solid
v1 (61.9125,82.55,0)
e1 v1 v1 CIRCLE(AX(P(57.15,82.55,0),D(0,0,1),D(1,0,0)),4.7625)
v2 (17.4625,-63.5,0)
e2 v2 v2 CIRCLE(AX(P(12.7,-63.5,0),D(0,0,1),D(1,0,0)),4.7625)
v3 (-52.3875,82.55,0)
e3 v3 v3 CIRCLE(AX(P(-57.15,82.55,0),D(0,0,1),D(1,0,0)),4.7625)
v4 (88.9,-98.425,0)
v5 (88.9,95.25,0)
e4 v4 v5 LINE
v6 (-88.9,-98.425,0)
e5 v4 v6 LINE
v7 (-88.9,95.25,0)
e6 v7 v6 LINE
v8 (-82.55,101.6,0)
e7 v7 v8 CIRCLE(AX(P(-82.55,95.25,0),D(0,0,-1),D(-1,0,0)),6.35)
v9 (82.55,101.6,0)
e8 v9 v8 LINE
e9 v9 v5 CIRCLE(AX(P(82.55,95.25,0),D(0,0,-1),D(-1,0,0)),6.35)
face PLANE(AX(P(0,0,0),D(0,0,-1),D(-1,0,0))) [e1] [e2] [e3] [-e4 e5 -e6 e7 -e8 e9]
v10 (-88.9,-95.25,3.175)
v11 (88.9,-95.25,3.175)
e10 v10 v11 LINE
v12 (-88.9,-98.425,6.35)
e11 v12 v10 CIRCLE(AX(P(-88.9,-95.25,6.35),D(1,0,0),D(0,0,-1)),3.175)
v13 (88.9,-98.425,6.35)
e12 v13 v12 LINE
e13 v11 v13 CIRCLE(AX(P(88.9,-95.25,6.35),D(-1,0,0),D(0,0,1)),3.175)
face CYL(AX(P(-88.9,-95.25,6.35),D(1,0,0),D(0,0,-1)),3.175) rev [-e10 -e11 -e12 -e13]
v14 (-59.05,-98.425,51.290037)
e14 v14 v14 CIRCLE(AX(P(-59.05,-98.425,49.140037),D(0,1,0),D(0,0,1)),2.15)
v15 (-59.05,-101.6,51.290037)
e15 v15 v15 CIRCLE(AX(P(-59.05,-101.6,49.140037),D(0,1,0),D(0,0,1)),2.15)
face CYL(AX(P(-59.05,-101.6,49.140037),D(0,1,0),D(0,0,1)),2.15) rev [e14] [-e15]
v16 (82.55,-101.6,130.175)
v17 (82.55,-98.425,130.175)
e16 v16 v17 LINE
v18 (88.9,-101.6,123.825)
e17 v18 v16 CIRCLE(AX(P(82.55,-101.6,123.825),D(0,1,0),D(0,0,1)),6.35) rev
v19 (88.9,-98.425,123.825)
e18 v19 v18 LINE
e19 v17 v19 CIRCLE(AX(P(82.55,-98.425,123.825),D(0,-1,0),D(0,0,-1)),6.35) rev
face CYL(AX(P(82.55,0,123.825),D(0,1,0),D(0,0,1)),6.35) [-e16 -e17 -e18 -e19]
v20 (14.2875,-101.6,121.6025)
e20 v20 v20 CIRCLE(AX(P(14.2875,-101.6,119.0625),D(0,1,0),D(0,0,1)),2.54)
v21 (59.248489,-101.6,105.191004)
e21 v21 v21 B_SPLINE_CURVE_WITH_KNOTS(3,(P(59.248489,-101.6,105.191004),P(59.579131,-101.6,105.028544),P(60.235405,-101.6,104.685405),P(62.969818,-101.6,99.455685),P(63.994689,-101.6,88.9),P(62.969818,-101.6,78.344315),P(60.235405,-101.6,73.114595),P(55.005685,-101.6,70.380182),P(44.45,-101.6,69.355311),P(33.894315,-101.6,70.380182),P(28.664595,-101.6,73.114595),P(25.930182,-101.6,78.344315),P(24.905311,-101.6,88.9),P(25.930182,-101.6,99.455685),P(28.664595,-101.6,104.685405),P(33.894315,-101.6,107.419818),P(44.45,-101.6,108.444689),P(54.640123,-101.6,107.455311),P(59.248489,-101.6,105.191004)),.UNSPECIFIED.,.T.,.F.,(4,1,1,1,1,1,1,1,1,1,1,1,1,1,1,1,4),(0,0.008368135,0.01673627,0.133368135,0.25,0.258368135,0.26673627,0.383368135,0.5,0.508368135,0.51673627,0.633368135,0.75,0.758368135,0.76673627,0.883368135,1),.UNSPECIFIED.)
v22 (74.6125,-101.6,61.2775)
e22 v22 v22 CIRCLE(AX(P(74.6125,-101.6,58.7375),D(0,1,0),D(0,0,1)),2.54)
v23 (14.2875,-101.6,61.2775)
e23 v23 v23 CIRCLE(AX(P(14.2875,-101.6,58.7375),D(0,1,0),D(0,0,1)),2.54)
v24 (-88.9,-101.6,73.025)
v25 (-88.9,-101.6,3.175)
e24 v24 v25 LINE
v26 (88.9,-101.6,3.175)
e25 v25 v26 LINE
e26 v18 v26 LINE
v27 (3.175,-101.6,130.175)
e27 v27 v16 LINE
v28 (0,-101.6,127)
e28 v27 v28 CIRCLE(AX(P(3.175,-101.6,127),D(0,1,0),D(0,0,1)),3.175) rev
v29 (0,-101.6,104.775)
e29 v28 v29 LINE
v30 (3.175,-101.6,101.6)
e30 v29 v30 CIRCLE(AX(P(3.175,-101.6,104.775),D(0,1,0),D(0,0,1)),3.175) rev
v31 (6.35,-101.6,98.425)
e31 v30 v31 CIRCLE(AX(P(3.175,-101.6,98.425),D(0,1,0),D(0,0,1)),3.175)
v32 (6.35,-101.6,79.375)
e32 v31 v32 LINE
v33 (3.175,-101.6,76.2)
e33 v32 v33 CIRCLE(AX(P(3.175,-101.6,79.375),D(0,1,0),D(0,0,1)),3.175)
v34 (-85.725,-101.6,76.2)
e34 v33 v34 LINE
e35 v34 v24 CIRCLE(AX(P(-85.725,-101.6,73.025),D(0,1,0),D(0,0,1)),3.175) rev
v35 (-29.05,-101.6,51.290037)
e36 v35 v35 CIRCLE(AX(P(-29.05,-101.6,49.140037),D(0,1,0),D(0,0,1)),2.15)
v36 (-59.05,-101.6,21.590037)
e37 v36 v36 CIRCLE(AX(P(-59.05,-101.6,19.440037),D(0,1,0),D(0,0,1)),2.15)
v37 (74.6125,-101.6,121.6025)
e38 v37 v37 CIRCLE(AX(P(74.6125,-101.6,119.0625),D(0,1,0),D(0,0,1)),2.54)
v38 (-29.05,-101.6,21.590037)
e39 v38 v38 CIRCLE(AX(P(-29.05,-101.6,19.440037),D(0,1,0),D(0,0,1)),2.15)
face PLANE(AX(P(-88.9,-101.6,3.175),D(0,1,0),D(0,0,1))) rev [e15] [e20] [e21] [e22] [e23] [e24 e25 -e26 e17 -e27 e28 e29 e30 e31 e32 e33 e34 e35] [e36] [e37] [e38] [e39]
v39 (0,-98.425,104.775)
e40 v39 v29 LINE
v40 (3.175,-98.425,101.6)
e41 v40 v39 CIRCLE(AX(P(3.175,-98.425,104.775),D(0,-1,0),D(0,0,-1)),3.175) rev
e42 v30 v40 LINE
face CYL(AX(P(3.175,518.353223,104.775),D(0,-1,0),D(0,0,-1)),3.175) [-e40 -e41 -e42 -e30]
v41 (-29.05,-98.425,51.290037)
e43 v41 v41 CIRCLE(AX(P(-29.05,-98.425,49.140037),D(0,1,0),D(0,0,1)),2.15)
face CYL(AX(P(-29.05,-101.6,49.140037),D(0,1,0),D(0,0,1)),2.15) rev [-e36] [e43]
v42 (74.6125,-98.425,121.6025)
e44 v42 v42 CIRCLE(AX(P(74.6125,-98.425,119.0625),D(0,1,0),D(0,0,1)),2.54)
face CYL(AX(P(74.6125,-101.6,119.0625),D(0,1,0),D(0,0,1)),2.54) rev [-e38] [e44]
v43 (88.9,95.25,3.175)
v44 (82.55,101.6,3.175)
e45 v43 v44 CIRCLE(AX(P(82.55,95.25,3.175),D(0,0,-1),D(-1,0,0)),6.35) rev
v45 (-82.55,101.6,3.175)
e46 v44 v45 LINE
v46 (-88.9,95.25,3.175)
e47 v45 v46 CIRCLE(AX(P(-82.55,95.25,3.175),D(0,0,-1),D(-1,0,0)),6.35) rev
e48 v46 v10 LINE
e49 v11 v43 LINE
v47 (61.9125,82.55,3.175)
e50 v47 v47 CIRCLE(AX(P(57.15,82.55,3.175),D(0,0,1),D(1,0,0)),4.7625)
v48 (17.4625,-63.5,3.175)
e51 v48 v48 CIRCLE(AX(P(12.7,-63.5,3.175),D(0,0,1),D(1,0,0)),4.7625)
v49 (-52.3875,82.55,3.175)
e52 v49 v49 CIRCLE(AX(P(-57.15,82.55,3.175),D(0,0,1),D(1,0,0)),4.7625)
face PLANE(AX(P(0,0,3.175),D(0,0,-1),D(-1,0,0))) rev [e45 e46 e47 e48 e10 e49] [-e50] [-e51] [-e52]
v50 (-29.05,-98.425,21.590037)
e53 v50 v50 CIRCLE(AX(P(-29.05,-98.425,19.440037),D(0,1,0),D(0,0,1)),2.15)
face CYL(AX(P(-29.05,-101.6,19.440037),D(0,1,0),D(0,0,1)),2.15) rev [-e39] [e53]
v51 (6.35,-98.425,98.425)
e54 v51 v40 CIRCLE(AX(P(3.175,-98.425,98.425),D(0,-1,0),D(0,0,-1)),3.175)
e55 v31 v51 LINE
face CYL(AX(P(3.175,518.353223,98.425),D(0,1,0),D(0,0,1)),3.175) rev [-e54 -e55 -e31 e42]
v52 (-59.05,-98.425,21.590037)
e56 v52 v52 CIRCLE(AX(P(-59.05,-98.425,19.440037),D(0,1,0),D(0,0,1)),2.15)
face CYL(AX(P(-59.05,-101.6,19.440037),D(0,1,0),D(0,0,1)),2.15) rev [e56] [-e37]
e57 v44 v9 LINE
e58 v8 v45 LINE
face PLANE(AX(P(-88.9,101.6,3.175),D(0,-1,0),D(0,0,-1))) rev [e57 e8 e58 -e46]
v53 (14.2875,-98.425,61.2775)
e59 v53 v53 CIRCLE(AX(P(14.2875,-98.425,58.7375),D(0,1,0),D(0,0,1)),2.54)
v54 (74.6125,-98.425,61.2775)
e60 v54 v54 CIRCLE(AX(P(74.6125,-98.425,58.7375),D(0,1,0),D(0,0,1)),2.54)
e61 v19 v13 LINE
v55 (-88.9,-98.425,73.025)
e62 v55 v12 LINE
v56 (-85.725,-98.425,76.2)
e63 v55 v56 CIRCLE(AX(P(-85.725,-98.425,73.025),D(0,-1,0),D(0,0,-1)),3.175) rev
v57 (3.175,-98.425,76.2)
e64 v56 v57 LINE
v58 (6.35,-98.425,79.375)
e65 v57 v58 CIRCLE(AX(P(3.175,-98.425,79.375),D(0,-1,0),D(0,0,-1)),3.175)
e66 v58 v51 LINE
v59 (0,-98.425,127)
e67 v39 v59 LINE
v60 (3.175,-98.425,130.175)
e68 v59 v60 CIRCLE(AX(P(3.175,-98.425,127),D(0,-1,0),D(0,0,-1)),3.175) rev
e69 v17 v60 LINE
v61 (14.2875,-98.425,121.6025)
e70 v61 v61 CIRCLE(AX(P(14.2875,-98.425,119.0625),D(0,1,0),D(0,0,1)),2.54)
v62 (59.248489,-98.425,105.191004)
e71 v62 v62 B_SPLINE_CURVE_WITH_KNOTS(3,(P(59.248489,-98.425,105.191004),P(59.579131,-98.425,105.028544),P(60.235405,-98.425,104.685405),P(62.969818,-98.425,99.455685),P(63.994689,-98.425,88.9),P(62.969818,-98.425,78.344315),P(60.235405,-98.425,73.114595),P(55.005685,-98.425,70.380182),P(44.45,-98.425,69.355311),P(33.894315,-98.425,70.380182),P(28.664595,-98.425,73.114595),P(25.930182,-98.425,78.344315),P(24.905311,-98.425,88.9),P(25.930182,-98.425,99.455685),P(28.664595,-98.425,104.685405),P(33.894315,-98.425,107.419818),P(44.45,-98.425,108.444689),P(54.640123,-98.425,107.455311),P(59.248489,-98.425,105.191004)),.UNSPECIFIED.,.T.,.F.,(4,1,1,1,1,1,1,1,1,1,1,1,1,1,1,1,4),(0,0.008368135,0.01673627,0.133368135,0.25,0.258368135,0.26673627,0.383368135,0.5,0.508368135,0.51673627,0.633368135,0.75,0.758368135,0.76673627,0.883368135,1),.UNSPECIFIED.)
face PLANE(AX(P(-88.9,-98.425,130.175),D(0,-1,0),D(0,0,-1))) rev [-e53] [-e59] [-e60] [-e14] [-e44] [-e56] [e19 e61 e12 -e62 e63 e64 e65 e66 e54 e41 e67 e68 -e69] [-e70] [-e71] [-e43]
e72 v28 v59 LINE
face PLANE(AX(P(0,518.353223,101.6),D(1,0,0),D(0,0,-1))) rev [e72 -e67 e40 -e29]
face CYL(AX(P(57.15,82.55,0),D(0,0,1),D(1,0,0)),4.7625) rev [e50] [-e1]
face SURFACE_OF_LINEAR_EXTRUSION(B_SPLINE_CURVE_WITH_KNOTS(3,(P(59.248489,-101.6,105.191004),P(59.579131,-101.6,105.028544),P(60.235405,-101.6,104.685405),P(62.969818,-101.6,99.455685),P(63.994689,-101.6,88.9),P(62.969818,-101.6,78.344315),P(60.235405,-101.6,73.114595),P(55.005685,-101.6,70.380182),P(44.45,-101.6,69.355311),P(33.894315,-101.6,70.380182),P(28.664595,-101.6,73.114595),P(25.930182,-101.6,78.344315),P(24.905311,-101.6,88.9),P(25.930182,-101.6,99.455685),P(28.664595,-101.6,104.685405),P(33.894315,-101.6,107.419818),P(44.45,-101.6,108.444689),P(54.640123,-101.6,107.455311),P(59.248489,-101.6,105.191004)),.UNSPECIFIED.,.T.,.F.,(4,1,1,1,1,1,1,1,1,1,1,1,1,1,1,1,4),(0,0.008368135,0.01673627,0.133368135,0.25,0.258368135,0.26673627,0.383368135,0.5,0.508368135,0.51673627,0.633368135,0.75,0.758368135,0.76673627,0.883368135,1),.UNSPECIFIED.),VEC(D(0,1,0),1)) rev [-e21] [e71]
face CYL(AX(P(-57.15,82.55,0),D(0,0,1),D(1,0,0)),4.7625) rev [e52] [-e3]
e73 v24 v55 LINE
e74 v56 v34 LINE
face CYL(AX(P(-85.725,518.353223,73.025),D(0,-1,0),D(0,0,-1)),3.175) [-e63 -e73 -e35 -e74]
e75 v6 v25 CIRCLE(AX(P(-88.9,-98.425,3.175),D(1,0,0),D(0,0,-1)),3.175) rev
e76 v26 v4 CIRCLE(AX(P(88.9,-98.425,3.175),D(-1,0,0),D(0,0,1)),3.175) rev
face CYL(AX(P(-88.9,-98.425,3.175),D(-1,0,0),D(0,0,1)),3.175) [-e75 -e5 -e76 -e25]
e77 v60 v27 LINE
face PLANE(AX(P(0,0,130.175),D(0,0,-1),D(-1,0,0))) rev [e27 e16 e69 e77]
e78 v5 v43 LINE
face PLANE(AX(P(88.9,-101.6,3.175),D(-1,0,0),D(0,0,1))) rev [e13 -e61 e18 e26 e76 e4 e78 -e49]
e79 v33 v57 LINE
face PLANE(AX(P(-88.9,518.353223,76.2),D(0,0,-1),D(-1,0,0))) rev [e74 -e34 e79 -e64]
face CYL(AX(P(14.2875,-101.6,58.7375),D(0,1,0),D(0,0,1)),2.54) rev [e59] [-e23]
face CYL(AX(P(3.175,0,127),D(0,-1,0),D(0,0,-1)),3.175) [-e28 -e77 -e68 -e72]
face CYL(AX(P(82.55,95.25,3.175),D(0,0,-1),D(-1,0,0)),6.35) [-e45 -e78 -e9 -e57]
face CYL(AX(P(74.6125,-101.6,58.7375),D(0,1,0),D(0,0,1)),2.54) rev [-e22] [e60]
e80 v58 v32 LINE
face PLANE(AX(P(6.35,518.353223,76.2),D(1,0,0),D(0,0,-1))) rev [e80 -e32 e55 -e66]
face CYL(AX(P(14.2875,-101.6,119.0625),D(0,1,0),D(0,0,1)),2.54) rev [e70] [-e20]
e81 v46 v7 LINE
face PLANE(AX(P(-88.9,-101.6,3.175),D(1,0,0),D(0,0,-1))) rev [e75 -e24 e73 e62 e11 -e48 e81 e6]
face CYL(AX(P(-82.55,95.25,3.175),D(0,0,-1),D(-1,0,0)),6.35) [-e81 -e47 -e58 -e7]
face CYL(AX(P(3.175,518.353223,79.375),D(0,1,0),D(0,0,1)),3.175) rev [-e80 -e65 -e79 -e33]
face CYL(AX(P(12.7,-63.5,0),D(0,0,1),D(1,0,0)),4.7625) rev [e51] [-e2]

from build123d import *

# Parameters (mm, degrees)
SKETCH2_W               = 177.8
SKETCH2_H               = 203.2
BOSS_EXTRUDE1_DEPTH     = 3.175
SKETCH3_W               = 177.8
SKETCH3_H               = 3.175
BOSS_EXTRUDE2_DEPTH     = 127
FILLET1_R               = 3.175
FILLET2_R               = 6.35
CUT_EXTRUDE1_DEPTH      = 255.673793803
CUT_EXTRUDE1_DEPTH_BACK = 255.673793803
FILLET4_R               = 3.175
SKETCH6_R               = 2.54
SKETCH6_R_2             = 2.15
CUT_EXTRUDE2_DEPTH      = 255.673793803
SKETCH7_R               = 4.7625
CUT_EXTRUDE3_DEPTH      = 186.350397895
CUT_EXTRUDE4_DEPTH      = 255.673793803


with BuildPart() as part:
    # Sketch2 → Boss-Extrude1 (new body)
    with BuildSketch(Plane.XY):
        Rectangle(SKETCH2_W, SKETCH2_H)
    extrude(amount=BOSS_EXTRUDE1_DEPTH)

    # Sketch3 → Boss-Extrude2 (add)
    with BuildSketch(Plane.XY.offset(3.175)):
        with Locations((0, -100.0125)):
            Rectangle(SKETCH3_W, SKETCH3_H)
    extrude(amount=BOSS_EXTRUDE2_DEPTH)

    # Fillet1
    fillet1_edges = [part.edges().sort_by_distance(p)[0] for p in [
        (0, -98.425, 3.175),
        (0, -101.6, 0),
    ]]
    fillet(fillet1_edges, radius=FILLET1_R)

    # Fillet2
    fillet2_edges = [part.edges().sort_by_distance(p)[0] for p in [
        (-88.9, -100.0125, 130.175),
        (88.9, -100.0125, 130.175),
        (-88.9, 101.6, 1.5875),
        (88.9, 101.6, 1.5875),
    ]]
    fillet(fillet2_edges, radius=FILLET2_R)

    # Sketch5 → Cut-Extrude1 (cut, two sides: drawn at the far end of the back side and taken through both)
    with BuildSketch(Plane(origin=(0, -98.425, 0), x_dir=(1, 0, 0), z_dir=(0, 1, 0)).offset(-CUT_EXTRUDE1_DEPTH_BACK)):
        Polygon((-485.781273778, -76.2), (-88.9, -76.2), (6.35, -76.2), (6.35, -101.6), (0, -101.6), (0, -130.175), (0, -527.056273778), (-539.971017798, -1108.855450333), (-1025.752291576, -657.999176556), align=None)
    extrude(amount=CUT_EXTRUDE1_DEPTH + CUT_EXTRUDE1_DEPTH_BACK, mode=Mode.SUBTRACT)

    # Fillet4
    fillet4_edges = [part.edges().sort_by_distance(p)[0] for p in [
        (6.35, -100.0125, 101.6),
        (-88.9, -100.0125, 76.2),
        (0, -100.0125, 130.175),
        (0, -100.0125, 101.6),
        (6.35, -100.0125, 76.2),
    ]]
    fillet(fillet4_edges, radius=FILLET4_R - 0.0001)  # a hair under: the kernel refuses the full size

    # Sketch6 → Cut-Extrude2 (cut, through all)
    with BuildSketch(Plane(origin=(0, -98.425, 0), x_dir=(1, 0, 0), z_dir=(0, 1, 0))):
        with Locations(Location((74.6125, -119.0625, 0), (0, 0, 270))):
            Circle(SKETCH6_R)
        with Locations(Location((14.2875, -119.0625, 0), (0, 0, 270))):
            Circle(SKETCH6_R)
        with Locations(Location((14.2875, -58.7375, 0), (0, 0, 270))):
            Circle(SKETCH6_R)
        with Locations(Location((74.6125, -58.7375, 0), (0, 0, 270))):
            Circle(SKETCH6_R)
        with Locations(Location((-29.05, -49.140037229, 0), (0, 0, 270))):
            Circle(SKETCH6_R_2)
        with Locations(Location((-59.05, -49.140037229, 0), (0, 0, 270))):
            Circle(SKETCH6_R_2)
        with Locations(Location((-29.05, -19.440037229, 0), (0, 0, 270))):
            Circle(SKETCH6_R_2)
        with Locations(Location((-59.05, -19.440037229, 0), (0, 0, 270))):
            Circle(SKETCH6_R_2)
    extrude(amount=-CUT_EXTRUDE2_DEPTH, mode=Mode.SUBTRACT)

    # Sketch7 → Cut-Extrude3 (cut, through all)
    with BuildSketch(Plane.XY.offset(3.175)):
        with Locations((-57.15, 82.55)):
            Circle(SKETCH7_R)
        with Locations((57.15, 82.55)):
            Circle(SKETCH7_R)
        with Locations((12.7, -63.5)):
            Circle(SKETCH7_R)
    extrude(amount=-CUT_EXTRUDE3_DEPTH, mode=Mode.SUBTRACT)

    # Sketch8 → Cut-Extrude4 (cut, through all)
    with BuildSketch(Plane(origin=(0, -98.425, 0), x_dir=(1, 0, 0), z_dir=(0, 1, 0))):
        with BuildLine():
            add(Edge.make_bspline(
                [(59.248488812, -105.191004458), (54.640123193, -107.455311414), (44.45, -108.444688585), (33.894314939, -107.419818363), (28.664595213, -104.685404787), (25.930181637, -99.455685061), (24.905311414, -88.9), (25.930181637, -78.344314939), (28.664595213, -73.114595213), (33.894314939, -70.380181637), (44.45, -69.355311414), (55.005685061, -70.380181637), (60.235404787, -73.114595213), (62.969818363, -78.344314939), (63.994688585, -88.9), (62.969818363, -99.455685061), (60.235404787, -104.685404787), (59.579131084, -105.028544346), (59.248488812, -105.191004458)],
                knots=[0, 0, 0, 0, 0.116631865, 0.23326373, 0.241631865, 0.25, 0.366631865, 0.48326373, 0.491631865, 0.5, 0.616631865, 0.73326373, 0.741631865, 0.75, 0.866631865, 0.98326373, 0.991631865, 1, 1, 1, 1], degree=3))
        make_face()
    extrude(amount=-CUT_EXTRUDE4_DEPTH, mode=Mode.SUBTRACT)


solid = part.part
